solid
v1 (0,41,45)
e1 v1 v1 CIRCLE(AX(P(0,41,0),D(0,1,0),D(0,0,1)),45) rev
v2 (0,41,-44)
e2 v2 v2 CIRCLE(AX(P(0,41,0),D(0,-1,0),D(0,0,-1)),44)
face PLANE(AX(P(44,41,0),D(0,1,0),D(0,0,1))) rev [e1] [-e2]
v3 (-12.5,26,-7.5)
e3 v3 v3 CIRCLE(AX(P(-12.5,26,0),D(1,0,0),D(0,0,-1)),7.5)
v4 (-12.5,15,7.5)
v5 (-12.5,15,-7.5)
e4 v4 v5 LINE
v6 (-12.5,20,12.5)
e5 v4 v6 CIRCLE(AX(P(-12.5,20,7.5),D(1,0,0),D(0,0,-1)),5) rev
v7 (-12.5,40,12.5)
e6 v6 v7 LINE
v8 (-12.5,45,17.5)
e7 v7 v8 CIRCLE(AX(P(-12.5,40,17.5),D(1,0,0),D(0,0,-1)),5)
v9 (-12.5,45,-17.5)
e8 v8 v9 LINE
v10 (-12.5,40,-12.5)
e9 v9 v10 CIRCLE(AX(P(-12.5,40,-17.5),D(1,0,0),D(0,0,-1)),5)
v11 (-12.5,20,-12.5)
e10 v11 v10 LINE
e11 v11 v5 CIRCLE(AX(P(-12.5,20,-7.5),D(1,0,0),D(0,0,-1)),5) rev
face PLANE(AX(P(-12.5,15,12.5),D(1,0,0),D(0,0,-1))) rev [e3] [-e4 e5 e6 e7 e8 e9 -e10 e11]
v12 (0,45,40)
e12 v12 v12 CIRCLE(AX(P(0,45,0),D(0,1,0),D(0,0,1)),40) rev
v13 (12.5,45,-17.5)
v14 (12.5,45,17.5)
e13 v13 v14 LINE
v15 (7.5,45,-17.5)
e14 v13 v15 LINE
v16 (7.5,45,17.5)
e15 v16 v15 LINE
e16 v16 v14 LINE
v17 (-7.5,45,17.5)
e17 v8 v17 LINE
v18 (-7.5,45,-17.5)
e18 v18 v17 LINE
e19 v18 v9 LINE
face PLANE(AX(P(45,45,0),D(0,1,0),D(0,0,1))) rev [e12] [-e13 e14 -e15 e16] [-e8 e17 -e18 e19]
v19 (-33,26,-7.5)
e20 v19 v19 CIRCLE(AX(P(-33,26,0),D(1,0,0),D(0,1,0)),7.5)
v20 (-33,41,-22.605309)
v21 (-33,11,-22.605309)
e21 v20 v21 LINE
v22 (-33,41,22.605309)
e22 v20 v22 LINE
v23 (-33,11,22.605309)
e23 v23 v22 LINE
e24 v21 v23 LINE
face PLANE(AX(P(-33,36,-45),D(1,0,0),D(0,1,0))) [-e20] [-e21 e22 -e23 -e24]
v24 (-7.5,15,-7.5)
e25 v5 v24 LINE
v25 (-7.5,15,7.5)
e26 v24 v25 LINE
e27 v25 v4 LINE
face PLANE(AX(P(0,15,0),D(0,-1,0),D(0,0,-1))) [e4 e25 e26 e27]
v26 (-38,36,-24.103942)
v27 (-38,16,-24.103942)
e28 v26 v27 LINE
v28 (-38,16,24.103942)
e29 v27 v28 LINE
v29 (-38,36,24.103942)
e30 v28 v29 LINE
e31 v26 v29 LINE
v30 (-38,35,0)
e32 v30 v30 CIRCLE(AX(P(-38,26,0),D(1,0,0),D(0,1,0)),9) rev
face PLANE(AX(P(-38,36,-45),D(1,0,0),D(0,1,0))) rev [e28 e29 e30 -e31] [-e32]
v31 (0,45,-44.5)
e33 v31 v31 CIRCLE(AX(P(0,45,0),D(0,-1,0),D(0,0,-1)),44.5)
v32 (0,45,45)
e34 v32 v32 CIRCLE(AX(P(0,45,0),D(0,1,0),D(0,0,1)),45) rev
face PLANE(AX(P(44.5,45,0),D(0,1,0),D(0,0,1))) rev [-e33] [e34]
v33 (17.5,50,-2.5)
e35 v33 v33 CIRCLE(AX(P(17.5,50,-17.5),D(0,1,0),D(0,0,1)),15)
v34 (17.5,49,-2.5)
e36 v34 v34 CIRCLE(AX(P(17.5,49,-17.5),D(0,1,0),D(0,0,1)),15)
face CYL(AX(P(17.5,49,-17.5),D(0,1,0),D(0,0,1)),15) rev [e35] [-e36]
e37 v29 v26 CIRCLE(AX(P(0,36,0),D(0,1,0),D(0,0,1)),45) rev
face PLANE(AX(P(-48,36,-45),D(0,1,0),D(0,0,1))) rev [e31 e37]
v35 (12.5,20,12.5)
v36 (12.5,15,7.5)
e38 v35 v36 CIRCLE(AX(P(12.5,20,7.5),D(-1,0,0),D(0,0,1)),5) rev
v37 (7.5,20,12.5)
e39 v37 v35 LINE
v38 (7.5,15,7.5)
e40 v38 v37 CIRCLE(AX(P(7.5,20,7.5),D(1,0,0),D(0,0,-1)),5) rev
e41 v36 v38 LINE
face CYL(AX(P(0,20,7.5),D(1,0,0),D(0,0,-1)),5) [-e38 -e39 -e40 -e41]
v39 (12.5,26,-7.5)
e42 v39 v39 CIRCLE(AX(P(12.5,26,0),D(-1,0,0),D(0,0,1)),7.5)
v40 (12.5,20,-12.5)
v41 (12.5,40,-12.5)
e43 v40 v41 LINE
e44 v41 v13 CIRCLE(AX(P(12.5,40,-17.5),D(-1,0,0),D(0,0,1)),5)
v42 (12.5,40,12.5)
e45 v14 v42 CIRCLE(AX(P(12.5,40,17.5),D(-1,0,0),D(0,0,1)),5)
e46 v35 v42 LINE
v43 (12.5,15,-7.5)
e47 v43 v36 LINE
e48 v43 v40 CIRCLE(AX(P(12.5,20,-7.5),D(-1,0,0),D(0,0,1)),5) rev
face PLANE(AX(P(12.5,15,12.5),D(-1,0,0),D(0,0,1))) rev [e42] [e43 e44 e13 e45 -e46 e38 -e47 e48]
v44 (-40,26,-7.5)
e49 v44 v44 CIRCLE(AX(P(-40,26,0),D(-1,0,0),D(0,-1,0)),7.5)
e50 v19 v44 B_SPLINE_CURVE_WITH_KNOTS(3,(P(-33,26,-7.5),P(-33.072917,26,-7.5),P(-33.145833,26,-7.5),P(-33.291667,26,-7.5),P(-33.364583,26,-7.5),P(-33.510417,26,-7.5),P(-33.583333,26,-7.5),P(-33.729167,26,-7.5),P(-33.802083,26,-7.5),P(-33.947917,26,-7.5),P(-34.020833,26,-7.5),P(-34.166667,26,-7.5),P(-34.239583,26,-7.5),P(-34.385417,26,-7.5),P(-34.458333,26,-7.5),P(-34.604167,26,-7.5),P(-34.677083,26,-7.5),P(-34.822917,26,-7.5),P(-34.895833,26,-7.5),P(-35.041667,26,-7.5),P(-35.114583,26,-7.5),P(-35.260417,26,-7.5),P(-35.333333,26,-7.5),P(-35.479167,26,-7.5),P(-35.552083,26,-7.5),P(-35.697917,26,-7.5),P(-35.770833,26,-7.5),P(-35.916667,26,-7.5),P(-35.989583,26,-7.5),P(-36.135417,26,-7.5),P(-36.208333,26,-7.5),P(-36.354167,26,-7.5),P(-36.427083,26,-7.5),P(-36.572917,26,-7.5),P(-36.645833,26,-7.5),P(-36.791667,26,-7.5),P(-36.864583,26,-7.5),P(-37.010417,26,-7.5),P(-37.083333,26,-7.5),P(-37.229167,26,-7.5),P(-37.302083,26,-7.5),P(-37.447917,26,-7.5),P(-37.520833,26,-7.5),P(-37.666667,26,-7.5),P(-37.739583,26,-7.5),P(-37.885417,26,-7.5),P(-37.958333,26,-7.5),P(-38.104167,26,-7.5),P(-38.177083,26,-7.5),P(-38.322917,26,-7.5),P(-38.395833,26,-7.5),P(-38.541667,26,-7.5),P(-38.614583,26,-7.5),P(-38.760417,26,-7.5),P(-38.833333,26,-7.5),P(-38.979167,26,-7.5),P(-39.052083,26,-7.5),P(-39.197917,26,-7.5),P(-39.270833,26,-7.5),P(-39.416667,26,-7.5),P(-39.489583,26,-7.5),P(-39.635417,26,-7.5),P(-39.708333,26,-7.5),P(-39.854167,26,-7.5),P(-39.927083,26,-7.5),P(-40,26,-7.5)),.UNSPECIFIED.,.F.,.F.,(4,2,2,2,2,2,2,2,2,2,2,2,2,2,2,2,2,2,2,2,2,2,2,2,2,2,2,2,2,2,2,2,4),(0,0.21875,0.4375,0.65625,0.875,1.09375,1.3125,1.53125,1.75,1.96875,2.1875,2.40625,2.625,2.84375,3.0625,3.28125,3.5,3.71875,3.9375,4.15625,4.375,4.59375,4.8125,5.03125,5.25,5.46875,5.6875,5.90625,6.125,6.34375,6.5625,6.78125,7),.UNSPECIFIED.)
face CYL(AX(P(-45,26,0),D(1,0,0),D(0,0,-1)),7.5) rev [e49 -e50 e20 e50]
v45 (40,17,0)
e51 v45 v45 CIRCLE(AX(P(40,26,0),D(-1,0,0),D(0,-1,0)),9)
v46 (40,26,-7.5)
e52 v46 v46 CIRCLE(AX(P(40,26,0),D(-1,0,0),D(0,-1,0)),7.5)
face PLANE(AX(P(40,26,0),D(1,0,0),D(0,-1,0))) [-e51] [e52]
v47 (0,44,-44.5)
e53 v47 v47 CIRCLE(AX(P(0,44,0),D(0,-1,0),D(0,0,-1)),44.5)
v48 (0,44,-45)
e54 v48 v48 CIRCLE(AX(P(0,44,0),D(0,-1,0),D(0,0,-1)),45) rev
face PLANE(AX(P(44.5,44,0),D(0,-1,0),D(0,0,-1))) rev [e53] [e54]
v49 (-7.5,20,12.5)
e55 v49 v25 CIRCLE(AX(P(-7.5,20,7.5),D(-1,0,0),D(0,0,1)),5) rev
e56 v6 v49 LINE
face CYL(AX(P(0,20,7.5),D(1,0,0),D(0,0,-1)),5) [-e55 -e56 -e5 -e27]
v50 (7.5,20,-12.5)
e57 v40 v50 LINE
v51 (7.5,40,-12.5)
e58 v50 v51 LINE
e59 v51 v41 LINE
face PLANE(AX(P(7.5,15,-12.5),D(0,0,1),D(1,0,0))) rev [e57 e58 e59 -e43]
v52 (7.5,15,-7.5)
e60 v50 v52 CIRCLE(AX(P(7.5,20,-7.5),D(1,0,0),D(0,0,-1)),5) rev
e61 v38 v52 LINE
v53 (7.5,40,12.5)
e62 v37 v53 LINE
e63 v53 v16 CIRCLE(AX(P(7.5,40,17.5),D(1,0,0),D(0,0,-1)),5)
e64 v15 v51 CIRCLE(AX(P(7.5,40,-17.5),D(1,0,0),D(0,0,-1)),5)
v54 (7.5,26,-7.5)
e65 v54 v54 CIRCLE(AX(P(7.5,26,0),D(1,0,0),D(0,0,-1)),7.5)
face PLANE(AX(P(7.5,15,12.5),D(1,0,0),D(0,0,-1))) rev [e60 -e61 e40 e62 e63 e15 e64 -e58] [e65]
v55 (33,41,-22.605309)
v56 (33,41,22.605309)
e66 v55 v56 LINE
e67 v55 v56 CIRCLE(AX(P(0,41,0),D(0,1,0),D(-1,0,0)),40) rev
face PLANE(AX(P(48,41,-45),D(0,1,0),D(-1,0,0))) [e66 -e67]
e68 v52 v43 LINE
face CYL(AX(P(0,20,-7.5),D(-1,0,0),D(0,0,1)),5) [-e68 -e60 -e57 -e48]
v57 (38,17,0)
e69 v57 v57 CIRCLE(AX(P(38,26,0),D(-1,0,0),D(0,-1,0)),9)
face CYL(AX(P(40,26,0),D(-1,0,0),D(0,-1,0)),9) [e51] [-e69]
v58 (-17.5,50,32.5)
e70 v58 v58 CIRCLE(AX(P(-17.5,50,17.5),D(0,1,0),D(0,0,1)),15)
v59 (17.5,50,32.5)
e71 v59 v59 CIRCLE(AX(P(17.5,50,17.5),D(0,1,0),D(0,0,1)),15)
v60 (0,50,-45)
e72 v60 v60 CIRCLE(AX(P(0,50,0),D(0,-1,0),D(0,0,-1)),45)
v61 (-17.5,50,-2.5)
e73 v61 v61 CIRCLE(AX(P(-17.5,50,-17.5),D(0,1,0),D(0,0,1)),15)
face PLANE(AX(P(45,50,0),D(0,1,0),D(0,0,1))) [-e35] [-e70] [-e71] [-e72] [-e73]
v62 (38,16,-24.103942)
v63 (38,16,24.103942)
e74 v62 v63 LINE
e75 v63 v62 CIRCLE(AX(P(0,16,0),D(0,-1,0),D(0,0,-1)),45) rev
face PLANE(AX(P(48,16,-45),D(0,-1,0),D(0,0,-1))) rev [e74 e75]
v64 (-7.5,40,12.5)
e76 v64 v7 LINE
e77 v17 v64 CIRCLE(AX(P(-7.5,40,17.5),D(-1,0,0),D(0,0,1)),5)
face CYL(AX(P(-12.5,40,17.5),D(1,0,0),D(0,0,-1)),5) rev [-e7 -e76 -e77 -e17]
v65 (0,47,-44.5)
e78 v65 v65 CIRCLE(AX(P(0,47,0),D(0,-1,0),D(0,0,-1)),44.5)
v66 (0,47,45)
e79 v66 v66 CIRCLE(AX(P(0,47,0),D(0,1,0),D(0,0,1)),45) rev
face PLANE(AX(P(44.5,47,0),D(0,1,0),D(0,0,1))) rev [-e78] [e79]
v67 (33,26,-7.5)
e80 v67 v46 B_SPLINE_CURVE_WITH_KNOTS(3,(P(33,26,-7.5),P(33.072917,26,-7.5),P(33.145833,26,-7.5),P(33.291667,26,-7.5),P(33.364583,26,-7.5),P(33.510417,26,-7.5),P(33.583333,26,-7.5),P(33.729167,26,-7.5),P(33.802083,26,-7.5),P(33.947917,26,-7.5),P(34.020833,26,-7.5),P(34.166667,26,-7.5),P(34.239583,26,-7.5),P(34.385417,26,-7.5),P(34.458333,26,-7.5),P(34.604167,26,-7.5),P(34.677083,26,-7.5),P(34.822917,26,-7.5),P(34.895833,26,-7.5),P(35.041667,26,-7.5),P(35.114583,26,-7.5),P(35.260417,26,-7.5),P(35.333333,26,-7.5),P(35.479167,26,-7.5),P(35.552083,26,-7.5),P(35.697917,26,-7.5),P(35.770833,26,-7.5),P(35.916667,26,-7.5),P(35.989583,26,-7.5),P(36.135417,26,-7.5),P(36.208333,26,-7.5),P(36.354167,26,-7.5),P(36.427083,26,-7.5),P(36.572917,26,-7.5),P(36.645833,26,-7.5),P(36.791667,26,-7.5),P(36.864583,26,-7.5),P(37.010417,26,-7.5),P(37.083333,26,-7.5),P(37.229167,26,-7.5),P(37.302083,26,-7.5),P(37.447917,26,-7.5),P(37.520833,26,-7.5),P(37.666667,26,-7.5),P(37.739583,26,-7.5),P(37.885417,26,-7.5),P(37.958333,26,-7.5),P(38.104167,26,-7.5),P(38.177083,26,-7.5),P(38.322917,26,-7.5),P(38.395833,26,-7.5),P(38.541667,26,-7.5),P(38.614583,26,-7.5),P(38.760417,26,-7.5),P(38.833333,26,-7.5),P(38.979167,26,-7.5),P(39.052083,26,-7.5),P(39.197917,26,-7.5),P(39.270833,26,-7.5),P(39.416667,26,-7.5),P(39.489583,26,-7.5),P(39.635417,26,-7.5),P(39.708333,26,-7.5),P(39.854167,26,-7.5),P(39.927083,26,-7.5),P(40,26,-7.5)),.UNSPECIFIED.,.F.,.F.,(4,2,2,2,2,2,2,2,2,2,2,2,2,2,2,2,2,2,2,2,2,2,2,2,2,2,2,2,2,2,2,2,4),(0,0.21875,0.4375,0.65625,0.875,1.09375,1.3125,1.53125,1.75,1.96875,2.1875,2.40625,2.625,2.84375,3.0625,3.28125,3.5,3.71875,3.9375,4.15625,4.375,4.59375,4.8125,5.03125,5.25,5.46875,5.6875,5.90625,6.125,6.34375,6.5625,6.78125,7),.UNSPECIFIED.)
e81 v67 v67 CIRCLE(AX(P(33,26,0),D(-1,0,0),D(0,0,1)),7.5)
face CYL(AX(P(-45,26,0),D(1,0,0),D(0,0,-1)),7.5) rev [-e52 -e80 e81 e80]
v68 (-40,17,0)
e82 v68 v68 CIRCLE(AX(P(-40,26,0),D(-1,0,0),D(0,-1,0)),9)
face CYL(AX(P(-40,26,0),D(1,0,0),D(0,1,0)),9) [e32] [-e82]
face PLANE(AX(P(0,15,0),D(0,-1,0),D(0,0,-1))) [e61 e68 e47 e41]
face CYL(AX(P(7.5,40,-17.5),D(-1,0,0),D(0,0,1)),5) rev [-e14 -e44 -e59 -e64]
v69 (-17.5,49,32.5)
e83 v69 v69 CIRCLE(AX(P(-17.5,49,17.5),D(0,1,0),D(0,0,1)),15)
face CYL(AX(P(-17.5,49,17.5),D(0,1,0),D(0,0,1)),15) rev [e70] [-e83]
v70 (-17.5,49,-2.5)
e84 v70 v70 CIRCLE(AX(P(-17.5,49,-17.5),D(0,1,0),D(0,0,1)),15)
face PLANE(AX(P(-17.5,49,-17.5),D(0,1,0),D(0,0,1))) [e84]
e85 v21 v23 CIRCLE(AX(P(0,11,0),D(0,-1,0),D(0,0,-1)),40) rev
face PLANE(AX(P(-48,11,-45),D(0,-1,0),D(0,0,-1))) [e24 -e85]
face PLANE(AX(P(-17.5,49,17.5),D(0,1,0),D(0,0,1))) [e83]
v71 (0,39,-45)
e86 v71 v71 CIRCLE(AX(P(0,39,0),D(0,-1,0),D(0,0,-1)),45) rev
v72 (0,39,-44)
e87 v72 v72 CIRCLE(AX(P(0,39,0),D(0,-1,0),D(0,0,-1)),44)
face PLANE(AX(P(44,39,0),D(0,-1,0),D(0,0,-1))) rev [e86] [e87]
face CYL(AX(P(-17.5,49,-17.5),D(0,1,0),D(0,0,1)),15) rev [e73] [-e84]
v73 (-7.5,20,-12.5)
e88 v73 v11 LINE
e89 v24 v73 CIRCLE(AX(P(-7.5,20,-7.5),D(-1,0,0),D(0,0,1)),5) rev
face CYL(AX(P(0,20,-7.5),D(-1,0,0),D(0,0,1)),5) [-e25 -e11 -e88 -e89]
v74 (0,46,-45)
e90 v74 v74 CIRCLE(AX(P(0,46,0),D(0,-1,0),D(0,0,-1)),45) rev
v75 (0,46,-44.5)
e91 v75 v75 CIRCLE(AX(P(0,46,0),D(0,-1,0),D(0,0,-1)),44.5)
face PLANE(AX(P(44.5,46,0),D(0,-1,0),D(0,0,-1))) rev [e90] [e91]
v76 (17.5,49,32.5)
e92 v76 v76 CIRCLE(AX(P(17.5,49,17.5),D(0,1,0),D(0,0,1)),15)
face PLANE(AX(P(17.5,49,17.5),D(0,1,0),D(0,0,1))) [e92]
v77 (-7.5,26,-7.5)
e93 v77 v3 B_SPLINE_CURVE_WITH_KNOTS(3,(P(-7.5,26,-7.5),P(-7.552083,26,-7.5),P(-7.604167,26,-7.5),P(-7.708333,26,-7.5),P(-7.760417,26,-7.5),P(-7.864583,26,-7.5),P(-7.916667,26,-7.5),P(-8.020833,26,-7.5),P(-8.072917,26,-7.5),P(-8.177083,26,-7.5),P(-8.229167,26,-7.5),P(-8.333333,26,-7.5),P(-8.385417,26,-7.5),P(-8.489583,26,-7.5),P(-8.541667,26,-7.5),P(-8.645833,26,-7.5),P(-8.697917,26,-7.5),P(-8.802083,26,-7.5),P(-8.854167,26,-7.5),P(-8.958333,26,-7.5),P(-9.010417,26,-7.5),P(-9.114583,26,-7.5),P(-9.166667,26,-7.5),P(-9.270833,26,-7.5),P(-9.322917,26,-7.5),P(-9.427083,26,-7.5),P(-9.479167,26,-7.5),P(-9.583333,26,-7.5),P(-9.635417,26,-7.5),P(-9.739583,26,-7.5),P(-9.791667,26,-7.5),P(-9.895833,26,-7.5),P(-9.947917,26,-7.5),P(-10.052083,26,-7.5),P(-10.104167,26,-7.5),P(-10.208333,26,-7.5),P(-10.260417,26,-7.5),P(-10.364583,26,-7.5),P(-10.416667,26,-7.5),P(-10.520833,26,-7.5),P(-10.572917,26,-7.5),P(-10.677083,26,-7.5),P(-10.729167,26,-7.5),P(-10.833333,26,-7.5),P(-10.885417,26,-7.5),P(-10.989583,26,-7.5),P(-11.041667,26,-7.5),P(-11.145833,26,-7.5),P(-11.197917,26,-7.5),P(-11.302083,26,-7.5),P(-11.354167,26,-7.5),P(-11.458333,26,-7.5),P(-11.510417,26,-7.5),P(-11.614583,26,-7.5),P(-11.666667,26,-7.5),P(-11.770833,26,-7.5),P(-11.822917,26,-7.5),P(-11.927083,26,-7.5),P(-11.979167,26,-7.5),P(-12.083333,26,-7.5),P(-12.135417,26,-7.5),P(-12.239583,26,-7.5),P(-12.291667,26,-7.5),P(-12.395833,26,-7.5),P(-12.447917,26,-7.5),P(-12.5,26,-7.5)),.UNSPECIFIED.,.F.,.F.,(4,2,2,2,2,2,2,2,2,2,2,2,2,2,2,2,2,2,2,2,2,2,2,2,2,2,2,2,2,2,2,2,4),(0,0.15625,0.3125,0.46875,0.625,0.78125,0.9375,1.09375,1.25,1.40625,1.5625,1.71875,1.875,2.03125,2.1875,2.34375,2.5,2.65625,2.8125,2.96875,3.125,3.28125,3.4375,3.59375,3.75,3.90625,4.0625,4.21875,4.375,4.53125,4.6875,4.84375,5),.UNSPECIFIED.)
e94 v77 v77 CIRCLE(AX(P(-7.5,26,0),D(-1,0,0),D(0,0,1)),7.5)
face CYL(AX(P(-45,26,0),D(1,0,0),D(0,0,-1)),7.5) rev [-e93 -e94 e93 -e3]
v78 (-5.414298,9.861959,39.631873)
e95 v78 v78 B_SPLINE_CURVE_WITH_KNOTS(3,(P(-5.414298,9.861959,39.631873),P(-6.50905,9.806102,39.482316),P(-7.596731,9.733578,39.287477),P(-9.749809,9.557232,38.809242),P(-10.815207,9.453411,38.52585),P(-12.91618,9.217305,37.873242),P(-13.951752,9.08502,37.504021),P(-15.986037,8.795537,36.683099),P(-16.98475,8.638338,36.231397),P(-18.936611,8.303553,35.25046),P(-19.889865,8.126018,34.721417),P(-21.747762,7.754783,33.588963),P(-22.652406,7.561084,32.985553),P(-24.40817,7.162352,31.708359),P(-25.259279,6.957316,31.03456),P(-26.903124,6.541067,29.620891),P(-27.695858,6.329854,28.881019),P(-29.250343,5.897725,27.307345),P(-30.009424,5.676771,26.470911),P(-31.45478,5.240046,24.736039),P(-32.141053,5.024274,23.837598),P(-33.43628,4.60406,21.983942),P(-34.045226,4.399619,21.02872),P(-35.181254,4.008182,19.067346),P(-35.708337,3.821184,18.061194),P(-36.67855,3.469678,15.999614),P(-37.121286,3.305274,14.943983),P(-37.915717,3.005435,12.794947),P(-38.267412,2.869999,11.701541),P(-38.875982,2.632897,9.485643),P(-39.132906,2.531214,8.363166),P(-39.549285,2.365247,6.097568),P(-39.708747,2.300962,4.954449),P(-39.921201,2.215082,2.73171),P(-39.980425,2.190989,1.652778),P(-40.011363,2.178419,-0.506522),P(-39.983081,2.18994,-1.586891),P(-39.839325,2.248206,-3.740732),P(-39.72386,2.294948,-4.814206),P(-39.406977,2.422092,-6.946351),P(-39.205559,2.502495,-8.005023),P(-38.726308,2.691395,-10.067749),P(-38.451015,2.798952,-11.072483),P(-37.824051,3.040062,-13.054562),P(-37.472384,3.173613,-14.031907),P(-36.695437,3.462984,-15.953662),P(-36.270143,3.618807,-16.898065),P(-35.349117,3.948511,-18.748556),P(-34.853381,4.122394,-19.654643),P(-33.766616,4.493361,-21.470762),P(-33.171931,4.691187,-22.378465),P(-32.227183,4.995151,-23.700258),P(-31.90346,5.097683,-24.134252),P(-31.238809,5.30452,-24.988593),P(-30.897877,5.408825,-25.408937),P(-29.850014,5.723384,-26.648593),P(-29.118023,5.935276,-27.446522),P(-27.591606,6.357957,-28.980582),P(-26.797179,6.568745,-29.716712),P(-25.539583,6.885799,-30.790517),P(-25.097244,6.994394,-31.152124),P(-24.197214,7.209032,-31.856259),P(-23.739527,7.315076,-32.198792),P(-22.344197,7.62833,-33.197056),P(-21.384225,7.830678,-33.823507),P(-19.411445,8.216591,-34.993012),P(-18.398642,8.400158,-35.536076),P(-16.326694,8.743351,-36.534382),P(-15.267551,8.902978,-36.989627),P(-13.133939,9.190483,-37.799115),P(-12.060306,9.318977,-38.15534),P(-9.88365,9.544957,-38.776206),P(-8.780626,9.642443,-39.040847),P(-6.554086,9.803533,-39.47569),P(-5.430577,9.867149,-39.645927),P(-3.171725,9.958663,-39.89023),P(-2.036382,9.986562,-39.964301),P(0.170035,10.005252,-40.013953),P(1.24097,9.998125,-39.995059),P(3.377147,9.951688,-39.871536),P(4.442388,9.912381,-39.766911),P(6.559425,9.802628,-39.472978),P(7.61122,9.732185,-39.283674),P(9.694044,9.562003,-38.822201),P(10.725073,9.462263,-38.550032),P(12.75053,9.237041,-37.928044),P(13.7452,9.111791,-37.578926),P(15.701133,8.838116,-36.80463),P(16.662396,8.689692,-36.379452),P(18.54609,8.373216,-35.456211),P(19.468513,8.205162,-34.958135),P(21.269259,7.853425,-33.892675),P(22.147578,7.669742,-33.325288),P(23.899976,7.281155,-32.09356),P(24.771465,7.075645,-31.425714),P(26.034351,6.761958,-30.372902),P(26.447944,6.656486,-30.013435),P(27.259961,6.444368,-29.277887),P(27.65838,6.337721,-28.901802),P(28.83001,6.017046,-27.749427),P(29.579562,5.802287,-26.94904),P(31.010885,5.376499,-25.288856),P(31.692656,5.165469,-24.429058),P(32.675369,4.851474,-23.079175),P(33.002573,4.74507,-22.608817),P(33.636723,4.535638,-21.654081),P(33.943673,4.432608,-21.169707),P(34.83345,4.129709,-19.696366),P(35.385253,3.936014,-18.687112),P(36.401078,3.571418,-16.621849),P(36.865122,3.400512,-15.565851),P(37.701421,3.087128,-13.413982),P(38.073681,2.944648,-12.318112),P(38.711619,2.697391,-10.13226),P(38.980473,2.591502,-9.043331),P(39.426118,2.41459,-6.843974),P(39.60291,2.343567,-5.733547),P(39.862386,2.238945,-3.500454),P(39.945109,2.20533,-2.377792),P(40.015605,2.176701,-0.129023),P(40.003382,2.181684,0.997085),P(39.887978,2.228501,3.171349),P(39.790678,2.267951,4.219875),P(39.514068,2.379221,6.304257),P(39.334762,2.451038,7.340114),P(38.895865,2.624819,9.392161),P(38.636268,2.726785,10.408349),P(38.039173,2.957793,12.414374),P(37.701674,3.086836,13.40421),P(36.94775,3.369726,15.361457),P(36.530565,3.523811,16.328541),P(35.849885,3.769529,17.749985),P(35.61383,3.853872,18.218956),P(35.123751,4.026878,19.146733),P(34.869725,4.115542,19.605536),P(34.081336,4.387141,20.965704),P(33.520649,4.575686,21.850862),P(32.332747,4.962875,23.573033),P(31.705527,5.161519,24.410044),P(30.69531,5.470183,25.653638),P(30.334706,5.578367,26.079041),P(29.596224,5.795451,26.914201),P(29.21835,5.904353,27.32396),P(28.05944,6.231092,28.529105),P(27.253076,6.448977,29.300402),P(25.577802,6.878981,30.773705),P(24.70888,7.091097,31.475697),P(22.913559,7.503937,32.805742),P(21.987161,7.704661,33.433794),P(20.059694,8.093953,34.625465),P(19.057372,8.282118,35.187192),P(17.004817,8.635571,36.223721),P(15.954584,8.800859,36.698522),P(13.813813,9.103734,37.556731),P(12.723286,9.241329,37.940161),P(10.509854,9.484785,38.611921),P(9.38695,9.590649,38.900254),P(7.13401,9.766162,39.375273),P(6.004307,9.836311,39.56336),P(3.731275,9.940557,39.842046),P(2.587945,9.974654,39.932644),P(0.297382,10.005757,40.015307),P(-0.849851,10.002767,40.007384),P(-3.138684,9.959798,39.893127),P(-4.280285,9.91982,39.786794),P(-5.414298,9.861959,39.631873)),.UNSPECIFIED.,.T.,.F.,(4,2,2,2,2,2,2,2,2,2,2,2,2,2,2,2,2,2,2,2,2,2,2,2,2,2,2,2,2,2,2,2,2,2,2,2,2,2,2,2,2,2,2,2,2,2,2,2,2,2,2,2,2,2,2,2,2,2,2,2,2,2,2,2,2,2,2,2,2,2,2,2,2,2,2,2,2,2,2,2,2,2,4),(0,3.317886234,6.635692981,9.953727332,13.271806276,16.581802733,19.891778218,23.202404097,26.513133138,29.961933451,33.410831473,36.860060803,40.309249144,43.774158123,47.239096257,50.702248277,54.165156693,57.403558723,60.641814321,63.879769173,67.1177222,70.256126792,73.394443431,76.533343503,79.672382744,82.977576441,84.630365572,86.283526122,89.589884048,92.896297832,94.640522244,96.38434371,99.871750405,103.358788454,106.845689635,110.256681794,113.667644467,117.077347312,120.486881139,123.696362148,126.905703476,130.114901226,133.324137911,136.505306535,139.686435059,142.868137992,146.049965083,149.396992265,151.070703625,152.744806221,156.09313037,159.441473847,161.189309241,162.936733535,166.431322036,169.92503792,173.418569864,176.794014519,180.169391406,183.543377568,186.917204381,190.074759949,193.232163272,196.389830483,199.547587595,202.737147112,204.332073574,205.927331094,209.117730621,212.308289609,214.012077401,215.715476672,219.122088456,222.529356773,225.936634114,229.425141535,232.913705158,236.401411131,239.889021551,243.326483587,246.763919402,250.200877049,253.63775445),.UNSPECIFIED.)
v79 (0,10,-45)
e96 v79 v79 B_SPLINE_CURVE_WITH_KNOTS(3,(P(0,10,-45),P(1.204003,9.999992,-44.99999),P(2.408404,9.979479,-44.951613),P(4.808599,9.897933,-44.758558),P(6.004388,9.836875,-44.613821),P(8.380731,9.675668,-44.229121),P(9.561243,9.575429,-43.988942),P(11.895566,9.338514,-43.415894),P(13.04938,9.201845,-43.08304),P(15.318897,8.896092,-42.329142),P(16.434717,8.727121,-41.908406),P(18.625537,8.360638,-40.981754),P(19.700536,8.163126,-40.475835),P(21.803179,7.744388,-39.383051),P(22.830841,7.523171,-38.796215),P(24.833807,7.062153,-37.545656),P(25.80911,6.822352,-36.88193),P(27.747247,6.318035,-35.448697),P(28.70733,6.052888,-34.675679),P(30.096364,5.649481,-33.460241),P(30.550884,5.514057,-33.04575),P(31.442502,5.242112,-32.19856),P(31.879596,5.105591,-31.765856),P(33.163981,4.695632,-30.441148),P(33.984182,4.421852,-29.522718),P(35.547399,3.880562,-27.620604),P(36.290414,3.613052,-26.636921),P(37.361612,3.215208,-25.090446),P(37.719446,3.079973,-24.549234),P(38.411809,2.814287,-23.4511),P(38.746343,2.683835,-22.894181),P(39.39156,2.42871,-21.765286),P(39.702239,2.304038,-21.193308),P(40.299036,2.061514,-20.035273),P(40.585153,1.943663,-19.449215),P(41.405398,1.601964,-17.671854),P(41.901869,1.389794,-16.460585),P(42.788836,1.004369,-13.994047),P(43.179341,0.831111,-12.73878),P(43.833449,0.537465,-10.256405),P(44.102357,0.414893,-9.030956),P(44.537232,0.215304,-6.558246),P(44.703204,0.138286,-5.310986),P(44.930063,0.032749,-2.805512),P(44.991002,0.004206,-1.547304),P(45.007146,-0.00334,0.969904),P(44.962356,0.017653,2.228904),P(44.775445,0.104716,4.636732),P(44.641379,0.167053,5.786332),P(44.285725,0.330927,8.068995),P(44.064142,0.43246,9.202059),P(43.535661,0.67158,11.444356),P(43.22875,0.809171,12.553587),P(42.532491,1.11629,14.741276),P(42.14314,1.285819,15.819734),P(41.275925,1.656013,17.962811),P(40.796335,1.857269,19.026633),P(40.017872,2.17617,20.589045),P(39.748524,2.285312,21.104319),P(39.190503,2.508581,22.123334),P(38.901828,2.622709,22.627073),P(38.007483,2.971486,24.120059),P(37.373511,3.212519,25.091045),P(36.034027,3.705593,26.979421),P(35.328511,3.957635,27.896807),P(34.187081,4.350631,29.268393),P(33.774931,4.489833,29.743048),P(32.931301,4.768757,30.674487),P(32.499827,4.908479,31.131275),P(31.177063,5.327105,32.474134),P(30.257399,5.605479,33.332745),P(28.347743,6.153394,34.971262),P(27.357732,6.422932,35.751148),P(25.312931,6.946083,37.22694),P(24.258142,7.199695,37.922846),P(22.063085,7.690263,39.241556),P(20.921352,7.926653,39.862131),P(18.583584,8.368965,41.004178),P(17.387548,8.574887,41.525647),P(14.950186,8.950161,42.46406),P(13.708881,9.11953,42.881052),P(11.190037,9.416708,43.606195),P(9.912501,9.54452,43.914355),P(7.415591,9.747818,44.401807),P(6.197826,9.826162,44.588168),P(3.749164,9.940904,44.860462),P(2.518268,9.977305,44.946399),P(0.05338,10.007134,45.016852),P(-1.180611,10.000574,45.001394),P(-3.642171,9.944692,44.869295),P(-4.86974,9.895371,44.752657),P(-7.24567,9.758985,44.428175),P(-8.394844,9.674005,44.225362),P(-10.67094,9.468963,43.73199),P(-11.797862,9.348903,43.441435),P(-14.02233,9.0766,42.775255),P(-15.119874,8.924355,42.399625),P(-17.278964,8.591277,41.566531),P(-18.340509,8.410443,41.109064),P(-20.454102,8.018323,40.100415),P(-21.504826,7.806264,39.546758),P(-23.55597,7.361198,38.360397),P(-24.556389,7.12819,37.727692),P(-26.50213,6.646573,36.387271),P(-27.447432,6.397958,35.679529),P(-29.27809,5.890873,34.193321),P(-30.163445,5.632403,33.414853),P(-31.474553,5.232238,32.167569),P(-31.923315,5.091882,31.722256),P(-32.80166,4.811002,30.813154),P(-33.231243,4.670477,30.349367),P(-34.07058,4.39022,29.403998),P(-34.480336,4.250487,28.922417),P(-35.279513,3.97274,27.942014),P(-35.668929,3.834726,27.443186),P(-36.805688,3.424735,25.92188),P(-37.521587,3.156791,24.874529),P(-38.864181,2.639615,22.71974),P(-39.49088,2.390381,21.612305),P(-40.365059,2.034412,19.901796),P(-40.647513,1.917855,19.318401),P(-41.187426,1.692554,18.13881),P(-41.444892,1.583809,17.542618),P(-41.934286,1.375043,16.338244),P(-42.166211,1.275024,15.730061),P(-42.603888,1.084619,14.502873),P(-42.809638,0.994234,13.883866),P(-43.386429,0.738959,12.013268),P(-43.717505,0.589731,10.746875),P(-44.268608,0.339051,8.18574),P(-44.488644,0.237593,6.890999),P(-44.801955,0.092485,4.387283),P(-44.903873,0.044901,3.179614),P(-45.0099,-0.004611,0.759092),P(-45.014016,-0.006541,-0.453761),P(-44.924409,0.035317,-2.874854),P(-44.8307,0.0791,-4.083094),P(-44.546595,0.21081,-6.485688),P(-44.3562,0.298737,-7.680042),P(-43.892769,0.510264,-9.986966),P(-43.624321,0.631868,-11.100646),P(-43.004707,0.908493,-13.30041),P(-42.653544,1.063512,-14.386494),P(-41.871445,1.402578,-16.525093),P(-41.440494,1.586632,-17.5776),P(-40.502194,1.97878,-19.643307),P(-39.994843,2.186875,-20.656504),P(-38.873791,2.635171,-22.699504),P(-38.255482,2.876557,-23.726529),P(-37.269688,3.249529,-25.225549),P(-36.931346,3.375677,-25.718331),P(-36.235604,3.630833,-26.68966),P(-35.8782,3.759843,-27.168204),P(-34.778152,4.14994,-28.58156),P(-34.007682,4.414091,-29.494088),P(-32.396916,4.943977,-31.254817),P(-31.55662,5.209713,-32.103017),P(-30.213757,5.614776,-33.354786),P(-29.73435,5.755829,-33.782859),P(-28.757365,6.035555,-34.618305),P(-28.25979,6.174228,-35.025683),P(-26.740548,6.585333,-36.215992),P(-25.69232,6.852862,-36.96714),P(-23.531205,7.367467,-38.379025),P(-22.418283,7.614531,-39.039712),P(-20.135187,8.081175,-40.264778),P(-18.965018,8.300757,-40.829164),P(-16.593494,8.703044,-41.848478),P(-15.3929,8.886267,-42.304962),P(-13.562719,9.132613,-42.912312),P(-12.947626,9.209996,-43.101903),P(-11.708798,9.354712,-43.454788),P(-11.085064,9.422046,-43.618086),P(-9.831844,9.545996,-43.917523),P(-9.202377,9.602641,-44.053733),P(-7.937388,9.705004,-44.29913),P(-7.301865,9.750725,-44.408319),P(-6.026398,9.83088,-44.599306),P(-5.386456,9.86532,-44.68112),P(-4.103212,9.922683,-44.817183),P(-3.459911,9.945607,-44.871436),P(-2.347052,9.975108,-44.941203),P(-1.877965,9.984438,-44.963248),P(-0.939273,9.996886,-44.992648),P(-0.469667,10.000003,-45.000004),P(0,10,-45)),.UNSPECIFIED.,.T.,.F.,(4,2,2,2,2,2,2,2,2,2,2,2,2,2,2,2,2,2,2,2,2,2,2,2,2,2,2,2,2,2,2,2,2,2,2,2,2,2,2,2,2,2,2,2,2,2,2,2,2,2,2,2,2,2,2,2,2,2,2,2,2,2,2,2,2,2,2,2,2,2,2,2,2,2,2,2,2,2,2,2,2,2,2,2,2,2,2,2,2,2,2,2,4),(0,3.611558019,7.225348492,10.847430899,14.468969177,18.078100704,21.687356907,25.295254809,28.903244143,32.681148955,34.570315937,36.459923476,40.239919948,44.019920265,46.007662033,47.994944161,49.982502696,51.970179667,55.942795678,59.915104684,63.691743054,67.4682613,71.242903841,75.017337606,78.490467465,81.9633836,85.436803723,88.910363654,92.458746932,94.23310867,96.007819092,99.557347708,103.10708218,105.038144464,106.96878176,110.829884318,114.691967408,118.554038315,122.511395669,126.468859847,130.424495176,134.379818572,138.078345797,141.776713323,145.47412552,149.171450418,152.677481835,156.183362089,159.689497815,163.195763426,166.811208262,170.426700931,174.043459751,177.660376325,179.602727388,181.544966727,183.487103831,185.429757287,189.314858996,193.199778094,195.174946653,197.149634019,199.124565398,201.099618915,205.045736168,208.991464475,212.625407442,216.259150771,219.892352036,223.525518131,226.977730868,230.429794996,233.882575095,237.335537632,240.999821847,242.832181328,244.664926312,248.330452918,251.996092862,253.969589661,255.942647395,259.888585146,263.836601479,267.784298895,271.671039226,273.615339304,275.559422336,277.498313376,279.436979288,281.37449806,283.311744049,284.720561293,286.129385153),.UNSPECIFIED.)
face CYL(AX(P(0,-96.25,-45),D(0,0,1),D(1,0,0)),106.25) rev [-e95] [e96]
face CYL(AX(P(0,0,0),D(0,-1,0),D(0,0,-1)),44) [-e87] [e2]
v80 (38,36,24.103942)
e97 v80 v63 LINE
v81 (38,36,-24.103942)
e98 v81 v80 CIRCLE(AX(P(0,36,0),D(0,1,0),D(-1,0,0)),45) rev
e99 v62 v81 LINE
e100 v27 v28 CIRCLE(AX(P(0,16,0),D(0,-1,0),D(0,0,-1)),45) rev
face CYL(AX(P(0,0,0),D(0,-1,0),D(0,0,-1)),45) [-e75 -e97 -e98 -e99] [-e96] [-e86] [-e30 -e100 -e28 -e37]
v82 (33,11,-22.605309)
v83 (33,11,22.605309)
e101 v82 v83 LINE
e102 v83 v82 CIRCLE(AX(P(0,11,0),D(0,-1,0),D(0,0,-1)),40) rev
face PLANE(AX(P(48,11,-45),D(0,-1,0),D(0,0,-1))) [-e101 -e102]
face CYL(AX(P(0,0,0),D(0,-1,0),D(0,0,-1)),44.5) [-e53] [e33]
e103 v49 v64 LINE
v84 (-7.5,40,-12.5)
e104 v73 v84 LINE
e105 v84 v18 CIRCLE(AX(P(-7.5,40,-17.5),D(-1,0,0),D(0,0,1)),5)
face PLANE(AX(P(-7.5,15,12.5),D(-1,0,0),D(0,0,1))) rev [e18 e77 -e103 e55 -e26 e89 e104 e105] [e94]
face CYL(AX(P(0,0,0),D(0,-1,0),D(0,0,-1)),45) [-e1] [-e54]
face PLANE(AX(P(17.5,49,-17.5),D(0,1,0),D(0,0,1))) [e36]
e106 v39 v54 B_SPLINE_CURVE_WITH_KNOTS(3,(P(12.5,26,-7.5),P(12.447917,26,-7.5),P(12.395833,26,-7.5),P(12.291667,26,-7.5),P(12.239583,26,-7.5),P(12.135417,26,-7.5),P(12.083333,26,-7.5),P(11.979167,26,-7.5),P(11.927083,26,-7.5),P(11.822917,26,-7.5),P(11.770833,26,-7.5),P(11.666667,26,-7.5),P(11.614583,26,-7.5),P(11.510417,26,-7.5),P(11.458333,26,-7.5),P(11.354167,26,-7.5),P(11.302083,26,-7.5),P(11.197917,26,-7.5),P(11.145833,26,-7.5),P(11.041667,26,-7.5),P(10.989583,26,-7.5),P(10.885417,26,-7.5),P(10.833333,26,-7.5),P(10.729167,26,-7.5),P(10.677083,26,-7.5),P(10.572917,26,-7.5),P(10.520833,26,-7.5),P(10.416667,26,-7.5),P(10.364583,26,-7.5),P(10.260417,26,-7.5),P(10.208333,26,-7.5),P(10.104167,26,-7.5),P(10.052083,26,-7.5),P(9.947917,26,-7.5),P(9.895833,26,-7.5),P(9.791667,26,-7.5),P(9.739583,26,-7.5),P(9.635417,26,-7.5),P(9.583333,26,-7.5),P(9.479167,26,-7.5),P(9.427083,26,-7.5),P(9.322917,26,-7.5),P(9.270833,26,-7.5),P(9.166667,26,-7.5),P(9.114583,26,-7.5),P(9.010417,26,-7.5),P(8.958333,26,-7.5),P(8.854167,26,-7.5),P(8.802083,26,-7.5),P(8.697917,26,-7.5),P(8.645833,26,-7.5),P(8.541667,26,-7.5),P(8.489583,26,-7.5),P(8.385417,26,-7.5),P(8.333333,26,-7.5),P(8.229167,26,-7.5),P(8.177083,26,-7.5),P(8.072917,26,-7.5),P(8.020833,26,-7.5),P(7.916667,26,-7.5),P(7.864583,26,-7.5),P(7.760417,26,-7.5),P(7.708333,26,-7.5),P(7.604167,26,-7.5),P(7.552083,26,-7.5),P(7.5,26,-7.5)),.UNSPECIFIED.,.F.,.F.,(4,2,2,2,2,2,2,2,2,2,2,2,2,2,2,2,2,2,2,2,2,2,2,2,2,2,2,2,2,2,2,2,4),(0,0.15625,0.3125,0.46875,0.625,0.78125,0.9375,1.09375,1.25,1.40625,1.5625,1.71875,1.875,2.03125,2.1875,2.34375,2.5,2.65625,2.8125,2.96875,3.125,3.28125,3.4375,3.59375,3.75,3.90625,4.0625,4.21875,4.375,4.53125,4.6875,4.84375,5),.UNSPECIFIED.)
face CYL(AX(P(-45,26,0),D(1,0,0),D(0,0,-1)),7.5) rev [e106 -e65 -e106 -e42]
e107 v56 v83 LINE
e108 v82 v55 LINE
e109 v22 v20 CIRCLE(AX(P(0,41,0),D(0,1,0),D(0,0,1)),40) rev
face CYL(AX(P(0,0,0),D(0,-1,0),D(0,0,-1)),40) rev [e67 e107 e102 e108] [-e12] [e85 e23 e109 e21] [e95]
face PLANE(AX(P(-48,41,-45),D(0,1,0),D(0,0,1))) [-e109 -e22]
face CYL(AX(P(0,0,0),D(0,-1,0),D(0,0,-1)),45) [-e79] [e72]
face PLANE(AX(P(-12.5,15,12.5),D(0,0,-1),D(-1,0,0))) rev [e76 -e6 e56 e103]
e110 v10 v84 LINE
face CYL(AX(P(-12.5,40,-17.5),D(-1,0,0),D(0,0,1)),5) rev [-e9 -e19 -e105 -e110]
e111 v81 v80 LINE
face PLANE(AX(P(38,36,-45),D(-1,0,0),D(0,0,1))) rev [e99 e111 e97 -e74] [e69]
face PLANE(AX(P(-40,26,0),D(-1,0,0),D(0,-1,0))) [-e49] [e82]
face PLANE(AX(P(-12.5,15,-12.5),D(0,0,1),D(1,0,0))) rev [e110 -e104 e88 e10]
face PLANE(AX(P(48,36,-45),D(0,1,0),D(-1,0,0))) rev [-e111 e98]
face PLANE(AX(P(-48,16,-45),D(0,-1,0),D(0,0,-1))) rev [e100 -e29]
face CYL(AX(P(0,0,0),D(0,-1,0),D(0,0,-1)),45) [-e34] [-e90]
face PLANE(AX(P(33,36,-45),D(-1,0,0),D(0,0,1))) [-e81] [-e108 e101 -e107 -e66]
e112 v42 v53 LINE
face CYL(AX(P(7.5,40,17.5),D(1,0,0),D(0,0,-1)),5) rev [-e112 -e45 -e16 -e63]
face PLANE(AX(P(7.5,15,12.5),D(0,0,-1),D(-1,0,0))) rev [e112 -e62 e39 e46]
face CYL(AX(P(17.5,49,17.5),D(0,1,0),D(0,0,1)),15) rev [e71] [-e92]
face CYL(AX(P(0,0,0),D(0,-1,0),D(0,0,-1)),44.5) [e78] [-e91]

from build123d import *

# Parameters (mm, degrees)
SKETCH1_W               = 45
SKETCH1_H               = 50
CUT_EXTRUDE1_DEPTH      = 81.932070281
CUT_EXTRUDE1_DEPTH_BACK = 81.932070281
SKETCH2_W               = 10
SKETCH2_H               = 20
SHELL1_START            = 2.183039109
SHELL1_DEPTH            = 42.816960891
SHELL1_START_2          = 1.475e-06
SHELL1_2_DEPTH          = 10.999998525
SHELL1_START_3          = 41
SHELL1_3_DEPTH          = 4
SKETCH5_W               = 1
SKETCH5_H               = 1
SKETCH5_W_2             = 2
SKETCH5_H_2             = 2
SKETCH6_R               = 15
CUT_EXTRUDE4_DEPTH      = 1
SKETCH7_W               = 5
SKETCH7_H               = 25
BOSS_EXTRUDE1_DEPTH     = 30
CUT_EXTRUDE2_DEPTH      = 81.932070392
CUT_EXTRUDE2_DEPTH_BACK = 81.932070392
SKETCH3_R               = 7.5
FILLET1_R               = 5
SKETCH8_R               = 9
SKETCH8_R_2             = 7.5
BOSS_EXTRUDE2_DEPTH     = 2
FILLET2_R               = 5


with BuildPart() as part:
    # Sketch1 → Revolve1 (revolve)
    with BuildSketch(Plane.XY, mode=Mode.PRIVATE) as revolve1_sk:
        with Locations((22.5, 25)):
            Rectangle(SKETCH1_W, SKETCH1_H)
    revolve(revolve1_sk.sketch.rotate(Axis((0, 0, 0), (0, 1, 0)), 90), axis=Axis((0, 0, 0), (0, 1, 0)))

    # Sketch2 → Cut-Extrude1 (cut, two sides: drawn at the far end of the back side and taken through both)
    with BuildSketch(Plane.XY.offset(-CUT_EXTRUDE1_DEPTH_BACK)):
        with Locations((-43, 26)):
            Rectangle(SKETCH2_W, SKETCH2_H)
        with Locations((43, 26)):
            Rectangle(SKETCH2_W, SKETCH2_H)
        with BuildLine():
            Line((-45, 0), (-48, 0))
            Line((-48, 0), (-48, -7.78624056))
            Line((-48, -7.78624056), (48, -7.78624056))
            Line((48, -7.78624056), (48, 0))
            Line((48, 0), (45, 0))
            ThreePointArc((45, 0), (0, 10), (-45, 0))
        make_face()
    extrude(amount=CUT_EXTRUDE1_DEPTH + CUT_EXTRUDE1_DEPTH_BACK, mode=Mode.SUBTRACT)

    # Shell1: read off the stored shape, not the designer's step
    # Shell1 outline → Shell1 (cut)
    with BuildSketch(Plane(origin=(0, 0, 0), x_dir=(1, 0, 0), z_dir=(0, 1, 0)).offset(SHELL1_START)):
        with BuildLine():
            Line((33, -22.605309111), (33, 22.605309111))
            ThreePointArc((33, 22.605309111), (0, 40), (-33, 22.605309111))
            Line((-33, 22.605309111), (-33, -22.605309111))
            ThreePointArc((-33, -22.605309111), (0, -40), (33, -22.605309111))
        make_face()
    extrude(amount=SHELL1_DEPTH, mode=Mode.SUBTRACT)

    # Shell1 2 outline → Shell1 2 (cut)
    with BuildSketch(Plane(origin=(0, 0, 0), x_dir=(1, 0, 0), z_dir=(0, 1, 0)).offset(SHELL1_START_2)):
        with BuildLine():
            ThreePointArc((33, -22.605309111), (40, 0), (33, 22.605309111))
            Line((33, 22.605309111), (33, -22.605309111))
        make_face()
        with BuildLine():
            Line((-33, -22.605309111), (-33, 22.605309111))
            ThreePointArc((-33, 22.605309111), (-40, 0), (-33, -22.605309111))
        make_face()
    extrude(amount=SHELL1_2_DEPTH, mode=Mode.SUBTRACT)

    # Shell1 3 outline → Shell1 3 (cut)
    with BuildSketch(Plane(origin=(0, 0, 0), x_dir=(1, 0, 0), z_dir=(0, 1, 0)).offset(SHELL1_START_3)):
        with BuildLine():
            ThreePointArc((33, -22.605309111), (40, 0), (33, 22.605309111))
            Line((33, 22.605309111), (33, -22.605309111))
        make_face()
        with BuildLine():
            Line((-33, -22.605309111), (-33, 22.605309111))
            ThreePointArc((-33, 22.605309111), (-40, 0), (-33, -22.605309111))
        make_face()
    extrude(amount=SHELL1_3_DEPTH, mode=Mode.SUBTRACT)

    # Sketch5 → Cut-Revolve1 (revolve, cut)
    with BuildSketch(Plane.XY, mode=Mode.PRIVATE) as cut_revolve1_sk:
        with Locations((45, 46.5)):
            Rectangle(SKETCH5_W, SKETCH5_H)
        with Locations((45, 44.5)):
            Rectangle(SKETCH5_W, SKETCH5_H)
        with Locations((45, 40)):
            Rectangle(SKETCH5_W_2, SKETCH5_H_2)
    revolve(cut_revolve1_sk.sketch.rotate(Axis((0, 0, 0), (0, 1, 0)), 90), axis=Axis((0, 0, 0), (0, 1, 0)), mode=Mode.SUBTRACT)

    # Sketch6 → Cut-Extrude4 (cut)
    with BuildSketch(Plane(origin=(0, 50, 0), x_dir=(1, 0, 0), z_dir=(0, 1, 0))):
        with Locations(Location((-17.5, 17.5, 0), (0, 0, 270))):
            Circle(SKETCH6_R)
        with Locations(Location((17.5, 17.5, 0), (0, 0, 270))):
            Circle(SKETCH6_R)
        with Locations(Location((-17.5, -17.5, 0), (0, 0, 270))):
            Circle(SKETCH6_R)
        with Locations(Location((17.5, -17.5, 0), (0, 0, 270))):
            Circle(SKETCH6_R)
    extrude(amount=-CUT_EXTRUDE4_DEPTH, mode=Mode.SUBTRACT)

    # Sketch7 → Boss-Extrude1 (add)
    with BuildSketch(Plane.XZ.offset(-45)):
        with Locations((-10, 0)):
            Rectangle(SKETCH7_W, SKETCH7_H)
        with Locations((10, 0)):
            Rectangle(SKETCH7_W, SKETCH7_H)
    extrude(amount=BOSS_EXTRUDE1_DEPTH)

    # Sketch3 → Cut-Extrude2 (cut, two sides: drawn at the far end of the back side and taken through both)
    with BuildSketch(Plane(origin=(0, 0, 0), x_dir=(0, 0, -1), z_dir=(1, 0, 0)).offset(-CUT_EXTRUDE2_DEPTH_BACK)):
        with Locations((0, 26)):
            Circle(SKETCH3_R)
    extrude(amount=CUT_EXTRUDE2_DEPTH + CUT_EXTRUDE2_DEPTH_BACK, mode=Mode.SUBTRACT)

    # Fillet1
    fillet1_edges = [part.edges().sort_by_distance(p)[0] for p in [
        (-10, 15, -12.5),
        (-10, 15, 12.5),
        (10, 15, -12.5),
        (10, 15, 12.5),
    ]]
    fillet(fillet1_edges, radius=FILLET1_R)

    # Sketch8 → Boss-Extrude2 (add)
    with BuildSketch(Plane.ZY.offset(38)):
        with Locations(Location((0, 26, 0), (0, 0, 90))):
            Circle(SKETCH8_R)
        with Locations(Location((0, 26, 0), (0, 0, 180))):
            Circle(SKETCH8_R_2, mode=Mode.SUBTRACT)
    boss_extrude2 = extrude(amount=BOSS_EXTRUDE2_DEPTH)

    # Mirror1: Boss-Extrude2 across plane
    add(boss_extrude2.mirror(Plane(origin=(0, 0, 0), x_dir=(0, 0, 1), z_dir=(1, 0, 0))))

    # Fillet2
    fillet2_edges = [part.edges().sort_by_distance(p)[0] for p in [
        (-10, 45, -12.5),
        (-10, 45, 12.5),
        (10, 45, -12.5),
        (10, 45, 12.5),
    ]]
    fillet(fillet2_edges, radius=FILLET2_R)


solid = part.part
